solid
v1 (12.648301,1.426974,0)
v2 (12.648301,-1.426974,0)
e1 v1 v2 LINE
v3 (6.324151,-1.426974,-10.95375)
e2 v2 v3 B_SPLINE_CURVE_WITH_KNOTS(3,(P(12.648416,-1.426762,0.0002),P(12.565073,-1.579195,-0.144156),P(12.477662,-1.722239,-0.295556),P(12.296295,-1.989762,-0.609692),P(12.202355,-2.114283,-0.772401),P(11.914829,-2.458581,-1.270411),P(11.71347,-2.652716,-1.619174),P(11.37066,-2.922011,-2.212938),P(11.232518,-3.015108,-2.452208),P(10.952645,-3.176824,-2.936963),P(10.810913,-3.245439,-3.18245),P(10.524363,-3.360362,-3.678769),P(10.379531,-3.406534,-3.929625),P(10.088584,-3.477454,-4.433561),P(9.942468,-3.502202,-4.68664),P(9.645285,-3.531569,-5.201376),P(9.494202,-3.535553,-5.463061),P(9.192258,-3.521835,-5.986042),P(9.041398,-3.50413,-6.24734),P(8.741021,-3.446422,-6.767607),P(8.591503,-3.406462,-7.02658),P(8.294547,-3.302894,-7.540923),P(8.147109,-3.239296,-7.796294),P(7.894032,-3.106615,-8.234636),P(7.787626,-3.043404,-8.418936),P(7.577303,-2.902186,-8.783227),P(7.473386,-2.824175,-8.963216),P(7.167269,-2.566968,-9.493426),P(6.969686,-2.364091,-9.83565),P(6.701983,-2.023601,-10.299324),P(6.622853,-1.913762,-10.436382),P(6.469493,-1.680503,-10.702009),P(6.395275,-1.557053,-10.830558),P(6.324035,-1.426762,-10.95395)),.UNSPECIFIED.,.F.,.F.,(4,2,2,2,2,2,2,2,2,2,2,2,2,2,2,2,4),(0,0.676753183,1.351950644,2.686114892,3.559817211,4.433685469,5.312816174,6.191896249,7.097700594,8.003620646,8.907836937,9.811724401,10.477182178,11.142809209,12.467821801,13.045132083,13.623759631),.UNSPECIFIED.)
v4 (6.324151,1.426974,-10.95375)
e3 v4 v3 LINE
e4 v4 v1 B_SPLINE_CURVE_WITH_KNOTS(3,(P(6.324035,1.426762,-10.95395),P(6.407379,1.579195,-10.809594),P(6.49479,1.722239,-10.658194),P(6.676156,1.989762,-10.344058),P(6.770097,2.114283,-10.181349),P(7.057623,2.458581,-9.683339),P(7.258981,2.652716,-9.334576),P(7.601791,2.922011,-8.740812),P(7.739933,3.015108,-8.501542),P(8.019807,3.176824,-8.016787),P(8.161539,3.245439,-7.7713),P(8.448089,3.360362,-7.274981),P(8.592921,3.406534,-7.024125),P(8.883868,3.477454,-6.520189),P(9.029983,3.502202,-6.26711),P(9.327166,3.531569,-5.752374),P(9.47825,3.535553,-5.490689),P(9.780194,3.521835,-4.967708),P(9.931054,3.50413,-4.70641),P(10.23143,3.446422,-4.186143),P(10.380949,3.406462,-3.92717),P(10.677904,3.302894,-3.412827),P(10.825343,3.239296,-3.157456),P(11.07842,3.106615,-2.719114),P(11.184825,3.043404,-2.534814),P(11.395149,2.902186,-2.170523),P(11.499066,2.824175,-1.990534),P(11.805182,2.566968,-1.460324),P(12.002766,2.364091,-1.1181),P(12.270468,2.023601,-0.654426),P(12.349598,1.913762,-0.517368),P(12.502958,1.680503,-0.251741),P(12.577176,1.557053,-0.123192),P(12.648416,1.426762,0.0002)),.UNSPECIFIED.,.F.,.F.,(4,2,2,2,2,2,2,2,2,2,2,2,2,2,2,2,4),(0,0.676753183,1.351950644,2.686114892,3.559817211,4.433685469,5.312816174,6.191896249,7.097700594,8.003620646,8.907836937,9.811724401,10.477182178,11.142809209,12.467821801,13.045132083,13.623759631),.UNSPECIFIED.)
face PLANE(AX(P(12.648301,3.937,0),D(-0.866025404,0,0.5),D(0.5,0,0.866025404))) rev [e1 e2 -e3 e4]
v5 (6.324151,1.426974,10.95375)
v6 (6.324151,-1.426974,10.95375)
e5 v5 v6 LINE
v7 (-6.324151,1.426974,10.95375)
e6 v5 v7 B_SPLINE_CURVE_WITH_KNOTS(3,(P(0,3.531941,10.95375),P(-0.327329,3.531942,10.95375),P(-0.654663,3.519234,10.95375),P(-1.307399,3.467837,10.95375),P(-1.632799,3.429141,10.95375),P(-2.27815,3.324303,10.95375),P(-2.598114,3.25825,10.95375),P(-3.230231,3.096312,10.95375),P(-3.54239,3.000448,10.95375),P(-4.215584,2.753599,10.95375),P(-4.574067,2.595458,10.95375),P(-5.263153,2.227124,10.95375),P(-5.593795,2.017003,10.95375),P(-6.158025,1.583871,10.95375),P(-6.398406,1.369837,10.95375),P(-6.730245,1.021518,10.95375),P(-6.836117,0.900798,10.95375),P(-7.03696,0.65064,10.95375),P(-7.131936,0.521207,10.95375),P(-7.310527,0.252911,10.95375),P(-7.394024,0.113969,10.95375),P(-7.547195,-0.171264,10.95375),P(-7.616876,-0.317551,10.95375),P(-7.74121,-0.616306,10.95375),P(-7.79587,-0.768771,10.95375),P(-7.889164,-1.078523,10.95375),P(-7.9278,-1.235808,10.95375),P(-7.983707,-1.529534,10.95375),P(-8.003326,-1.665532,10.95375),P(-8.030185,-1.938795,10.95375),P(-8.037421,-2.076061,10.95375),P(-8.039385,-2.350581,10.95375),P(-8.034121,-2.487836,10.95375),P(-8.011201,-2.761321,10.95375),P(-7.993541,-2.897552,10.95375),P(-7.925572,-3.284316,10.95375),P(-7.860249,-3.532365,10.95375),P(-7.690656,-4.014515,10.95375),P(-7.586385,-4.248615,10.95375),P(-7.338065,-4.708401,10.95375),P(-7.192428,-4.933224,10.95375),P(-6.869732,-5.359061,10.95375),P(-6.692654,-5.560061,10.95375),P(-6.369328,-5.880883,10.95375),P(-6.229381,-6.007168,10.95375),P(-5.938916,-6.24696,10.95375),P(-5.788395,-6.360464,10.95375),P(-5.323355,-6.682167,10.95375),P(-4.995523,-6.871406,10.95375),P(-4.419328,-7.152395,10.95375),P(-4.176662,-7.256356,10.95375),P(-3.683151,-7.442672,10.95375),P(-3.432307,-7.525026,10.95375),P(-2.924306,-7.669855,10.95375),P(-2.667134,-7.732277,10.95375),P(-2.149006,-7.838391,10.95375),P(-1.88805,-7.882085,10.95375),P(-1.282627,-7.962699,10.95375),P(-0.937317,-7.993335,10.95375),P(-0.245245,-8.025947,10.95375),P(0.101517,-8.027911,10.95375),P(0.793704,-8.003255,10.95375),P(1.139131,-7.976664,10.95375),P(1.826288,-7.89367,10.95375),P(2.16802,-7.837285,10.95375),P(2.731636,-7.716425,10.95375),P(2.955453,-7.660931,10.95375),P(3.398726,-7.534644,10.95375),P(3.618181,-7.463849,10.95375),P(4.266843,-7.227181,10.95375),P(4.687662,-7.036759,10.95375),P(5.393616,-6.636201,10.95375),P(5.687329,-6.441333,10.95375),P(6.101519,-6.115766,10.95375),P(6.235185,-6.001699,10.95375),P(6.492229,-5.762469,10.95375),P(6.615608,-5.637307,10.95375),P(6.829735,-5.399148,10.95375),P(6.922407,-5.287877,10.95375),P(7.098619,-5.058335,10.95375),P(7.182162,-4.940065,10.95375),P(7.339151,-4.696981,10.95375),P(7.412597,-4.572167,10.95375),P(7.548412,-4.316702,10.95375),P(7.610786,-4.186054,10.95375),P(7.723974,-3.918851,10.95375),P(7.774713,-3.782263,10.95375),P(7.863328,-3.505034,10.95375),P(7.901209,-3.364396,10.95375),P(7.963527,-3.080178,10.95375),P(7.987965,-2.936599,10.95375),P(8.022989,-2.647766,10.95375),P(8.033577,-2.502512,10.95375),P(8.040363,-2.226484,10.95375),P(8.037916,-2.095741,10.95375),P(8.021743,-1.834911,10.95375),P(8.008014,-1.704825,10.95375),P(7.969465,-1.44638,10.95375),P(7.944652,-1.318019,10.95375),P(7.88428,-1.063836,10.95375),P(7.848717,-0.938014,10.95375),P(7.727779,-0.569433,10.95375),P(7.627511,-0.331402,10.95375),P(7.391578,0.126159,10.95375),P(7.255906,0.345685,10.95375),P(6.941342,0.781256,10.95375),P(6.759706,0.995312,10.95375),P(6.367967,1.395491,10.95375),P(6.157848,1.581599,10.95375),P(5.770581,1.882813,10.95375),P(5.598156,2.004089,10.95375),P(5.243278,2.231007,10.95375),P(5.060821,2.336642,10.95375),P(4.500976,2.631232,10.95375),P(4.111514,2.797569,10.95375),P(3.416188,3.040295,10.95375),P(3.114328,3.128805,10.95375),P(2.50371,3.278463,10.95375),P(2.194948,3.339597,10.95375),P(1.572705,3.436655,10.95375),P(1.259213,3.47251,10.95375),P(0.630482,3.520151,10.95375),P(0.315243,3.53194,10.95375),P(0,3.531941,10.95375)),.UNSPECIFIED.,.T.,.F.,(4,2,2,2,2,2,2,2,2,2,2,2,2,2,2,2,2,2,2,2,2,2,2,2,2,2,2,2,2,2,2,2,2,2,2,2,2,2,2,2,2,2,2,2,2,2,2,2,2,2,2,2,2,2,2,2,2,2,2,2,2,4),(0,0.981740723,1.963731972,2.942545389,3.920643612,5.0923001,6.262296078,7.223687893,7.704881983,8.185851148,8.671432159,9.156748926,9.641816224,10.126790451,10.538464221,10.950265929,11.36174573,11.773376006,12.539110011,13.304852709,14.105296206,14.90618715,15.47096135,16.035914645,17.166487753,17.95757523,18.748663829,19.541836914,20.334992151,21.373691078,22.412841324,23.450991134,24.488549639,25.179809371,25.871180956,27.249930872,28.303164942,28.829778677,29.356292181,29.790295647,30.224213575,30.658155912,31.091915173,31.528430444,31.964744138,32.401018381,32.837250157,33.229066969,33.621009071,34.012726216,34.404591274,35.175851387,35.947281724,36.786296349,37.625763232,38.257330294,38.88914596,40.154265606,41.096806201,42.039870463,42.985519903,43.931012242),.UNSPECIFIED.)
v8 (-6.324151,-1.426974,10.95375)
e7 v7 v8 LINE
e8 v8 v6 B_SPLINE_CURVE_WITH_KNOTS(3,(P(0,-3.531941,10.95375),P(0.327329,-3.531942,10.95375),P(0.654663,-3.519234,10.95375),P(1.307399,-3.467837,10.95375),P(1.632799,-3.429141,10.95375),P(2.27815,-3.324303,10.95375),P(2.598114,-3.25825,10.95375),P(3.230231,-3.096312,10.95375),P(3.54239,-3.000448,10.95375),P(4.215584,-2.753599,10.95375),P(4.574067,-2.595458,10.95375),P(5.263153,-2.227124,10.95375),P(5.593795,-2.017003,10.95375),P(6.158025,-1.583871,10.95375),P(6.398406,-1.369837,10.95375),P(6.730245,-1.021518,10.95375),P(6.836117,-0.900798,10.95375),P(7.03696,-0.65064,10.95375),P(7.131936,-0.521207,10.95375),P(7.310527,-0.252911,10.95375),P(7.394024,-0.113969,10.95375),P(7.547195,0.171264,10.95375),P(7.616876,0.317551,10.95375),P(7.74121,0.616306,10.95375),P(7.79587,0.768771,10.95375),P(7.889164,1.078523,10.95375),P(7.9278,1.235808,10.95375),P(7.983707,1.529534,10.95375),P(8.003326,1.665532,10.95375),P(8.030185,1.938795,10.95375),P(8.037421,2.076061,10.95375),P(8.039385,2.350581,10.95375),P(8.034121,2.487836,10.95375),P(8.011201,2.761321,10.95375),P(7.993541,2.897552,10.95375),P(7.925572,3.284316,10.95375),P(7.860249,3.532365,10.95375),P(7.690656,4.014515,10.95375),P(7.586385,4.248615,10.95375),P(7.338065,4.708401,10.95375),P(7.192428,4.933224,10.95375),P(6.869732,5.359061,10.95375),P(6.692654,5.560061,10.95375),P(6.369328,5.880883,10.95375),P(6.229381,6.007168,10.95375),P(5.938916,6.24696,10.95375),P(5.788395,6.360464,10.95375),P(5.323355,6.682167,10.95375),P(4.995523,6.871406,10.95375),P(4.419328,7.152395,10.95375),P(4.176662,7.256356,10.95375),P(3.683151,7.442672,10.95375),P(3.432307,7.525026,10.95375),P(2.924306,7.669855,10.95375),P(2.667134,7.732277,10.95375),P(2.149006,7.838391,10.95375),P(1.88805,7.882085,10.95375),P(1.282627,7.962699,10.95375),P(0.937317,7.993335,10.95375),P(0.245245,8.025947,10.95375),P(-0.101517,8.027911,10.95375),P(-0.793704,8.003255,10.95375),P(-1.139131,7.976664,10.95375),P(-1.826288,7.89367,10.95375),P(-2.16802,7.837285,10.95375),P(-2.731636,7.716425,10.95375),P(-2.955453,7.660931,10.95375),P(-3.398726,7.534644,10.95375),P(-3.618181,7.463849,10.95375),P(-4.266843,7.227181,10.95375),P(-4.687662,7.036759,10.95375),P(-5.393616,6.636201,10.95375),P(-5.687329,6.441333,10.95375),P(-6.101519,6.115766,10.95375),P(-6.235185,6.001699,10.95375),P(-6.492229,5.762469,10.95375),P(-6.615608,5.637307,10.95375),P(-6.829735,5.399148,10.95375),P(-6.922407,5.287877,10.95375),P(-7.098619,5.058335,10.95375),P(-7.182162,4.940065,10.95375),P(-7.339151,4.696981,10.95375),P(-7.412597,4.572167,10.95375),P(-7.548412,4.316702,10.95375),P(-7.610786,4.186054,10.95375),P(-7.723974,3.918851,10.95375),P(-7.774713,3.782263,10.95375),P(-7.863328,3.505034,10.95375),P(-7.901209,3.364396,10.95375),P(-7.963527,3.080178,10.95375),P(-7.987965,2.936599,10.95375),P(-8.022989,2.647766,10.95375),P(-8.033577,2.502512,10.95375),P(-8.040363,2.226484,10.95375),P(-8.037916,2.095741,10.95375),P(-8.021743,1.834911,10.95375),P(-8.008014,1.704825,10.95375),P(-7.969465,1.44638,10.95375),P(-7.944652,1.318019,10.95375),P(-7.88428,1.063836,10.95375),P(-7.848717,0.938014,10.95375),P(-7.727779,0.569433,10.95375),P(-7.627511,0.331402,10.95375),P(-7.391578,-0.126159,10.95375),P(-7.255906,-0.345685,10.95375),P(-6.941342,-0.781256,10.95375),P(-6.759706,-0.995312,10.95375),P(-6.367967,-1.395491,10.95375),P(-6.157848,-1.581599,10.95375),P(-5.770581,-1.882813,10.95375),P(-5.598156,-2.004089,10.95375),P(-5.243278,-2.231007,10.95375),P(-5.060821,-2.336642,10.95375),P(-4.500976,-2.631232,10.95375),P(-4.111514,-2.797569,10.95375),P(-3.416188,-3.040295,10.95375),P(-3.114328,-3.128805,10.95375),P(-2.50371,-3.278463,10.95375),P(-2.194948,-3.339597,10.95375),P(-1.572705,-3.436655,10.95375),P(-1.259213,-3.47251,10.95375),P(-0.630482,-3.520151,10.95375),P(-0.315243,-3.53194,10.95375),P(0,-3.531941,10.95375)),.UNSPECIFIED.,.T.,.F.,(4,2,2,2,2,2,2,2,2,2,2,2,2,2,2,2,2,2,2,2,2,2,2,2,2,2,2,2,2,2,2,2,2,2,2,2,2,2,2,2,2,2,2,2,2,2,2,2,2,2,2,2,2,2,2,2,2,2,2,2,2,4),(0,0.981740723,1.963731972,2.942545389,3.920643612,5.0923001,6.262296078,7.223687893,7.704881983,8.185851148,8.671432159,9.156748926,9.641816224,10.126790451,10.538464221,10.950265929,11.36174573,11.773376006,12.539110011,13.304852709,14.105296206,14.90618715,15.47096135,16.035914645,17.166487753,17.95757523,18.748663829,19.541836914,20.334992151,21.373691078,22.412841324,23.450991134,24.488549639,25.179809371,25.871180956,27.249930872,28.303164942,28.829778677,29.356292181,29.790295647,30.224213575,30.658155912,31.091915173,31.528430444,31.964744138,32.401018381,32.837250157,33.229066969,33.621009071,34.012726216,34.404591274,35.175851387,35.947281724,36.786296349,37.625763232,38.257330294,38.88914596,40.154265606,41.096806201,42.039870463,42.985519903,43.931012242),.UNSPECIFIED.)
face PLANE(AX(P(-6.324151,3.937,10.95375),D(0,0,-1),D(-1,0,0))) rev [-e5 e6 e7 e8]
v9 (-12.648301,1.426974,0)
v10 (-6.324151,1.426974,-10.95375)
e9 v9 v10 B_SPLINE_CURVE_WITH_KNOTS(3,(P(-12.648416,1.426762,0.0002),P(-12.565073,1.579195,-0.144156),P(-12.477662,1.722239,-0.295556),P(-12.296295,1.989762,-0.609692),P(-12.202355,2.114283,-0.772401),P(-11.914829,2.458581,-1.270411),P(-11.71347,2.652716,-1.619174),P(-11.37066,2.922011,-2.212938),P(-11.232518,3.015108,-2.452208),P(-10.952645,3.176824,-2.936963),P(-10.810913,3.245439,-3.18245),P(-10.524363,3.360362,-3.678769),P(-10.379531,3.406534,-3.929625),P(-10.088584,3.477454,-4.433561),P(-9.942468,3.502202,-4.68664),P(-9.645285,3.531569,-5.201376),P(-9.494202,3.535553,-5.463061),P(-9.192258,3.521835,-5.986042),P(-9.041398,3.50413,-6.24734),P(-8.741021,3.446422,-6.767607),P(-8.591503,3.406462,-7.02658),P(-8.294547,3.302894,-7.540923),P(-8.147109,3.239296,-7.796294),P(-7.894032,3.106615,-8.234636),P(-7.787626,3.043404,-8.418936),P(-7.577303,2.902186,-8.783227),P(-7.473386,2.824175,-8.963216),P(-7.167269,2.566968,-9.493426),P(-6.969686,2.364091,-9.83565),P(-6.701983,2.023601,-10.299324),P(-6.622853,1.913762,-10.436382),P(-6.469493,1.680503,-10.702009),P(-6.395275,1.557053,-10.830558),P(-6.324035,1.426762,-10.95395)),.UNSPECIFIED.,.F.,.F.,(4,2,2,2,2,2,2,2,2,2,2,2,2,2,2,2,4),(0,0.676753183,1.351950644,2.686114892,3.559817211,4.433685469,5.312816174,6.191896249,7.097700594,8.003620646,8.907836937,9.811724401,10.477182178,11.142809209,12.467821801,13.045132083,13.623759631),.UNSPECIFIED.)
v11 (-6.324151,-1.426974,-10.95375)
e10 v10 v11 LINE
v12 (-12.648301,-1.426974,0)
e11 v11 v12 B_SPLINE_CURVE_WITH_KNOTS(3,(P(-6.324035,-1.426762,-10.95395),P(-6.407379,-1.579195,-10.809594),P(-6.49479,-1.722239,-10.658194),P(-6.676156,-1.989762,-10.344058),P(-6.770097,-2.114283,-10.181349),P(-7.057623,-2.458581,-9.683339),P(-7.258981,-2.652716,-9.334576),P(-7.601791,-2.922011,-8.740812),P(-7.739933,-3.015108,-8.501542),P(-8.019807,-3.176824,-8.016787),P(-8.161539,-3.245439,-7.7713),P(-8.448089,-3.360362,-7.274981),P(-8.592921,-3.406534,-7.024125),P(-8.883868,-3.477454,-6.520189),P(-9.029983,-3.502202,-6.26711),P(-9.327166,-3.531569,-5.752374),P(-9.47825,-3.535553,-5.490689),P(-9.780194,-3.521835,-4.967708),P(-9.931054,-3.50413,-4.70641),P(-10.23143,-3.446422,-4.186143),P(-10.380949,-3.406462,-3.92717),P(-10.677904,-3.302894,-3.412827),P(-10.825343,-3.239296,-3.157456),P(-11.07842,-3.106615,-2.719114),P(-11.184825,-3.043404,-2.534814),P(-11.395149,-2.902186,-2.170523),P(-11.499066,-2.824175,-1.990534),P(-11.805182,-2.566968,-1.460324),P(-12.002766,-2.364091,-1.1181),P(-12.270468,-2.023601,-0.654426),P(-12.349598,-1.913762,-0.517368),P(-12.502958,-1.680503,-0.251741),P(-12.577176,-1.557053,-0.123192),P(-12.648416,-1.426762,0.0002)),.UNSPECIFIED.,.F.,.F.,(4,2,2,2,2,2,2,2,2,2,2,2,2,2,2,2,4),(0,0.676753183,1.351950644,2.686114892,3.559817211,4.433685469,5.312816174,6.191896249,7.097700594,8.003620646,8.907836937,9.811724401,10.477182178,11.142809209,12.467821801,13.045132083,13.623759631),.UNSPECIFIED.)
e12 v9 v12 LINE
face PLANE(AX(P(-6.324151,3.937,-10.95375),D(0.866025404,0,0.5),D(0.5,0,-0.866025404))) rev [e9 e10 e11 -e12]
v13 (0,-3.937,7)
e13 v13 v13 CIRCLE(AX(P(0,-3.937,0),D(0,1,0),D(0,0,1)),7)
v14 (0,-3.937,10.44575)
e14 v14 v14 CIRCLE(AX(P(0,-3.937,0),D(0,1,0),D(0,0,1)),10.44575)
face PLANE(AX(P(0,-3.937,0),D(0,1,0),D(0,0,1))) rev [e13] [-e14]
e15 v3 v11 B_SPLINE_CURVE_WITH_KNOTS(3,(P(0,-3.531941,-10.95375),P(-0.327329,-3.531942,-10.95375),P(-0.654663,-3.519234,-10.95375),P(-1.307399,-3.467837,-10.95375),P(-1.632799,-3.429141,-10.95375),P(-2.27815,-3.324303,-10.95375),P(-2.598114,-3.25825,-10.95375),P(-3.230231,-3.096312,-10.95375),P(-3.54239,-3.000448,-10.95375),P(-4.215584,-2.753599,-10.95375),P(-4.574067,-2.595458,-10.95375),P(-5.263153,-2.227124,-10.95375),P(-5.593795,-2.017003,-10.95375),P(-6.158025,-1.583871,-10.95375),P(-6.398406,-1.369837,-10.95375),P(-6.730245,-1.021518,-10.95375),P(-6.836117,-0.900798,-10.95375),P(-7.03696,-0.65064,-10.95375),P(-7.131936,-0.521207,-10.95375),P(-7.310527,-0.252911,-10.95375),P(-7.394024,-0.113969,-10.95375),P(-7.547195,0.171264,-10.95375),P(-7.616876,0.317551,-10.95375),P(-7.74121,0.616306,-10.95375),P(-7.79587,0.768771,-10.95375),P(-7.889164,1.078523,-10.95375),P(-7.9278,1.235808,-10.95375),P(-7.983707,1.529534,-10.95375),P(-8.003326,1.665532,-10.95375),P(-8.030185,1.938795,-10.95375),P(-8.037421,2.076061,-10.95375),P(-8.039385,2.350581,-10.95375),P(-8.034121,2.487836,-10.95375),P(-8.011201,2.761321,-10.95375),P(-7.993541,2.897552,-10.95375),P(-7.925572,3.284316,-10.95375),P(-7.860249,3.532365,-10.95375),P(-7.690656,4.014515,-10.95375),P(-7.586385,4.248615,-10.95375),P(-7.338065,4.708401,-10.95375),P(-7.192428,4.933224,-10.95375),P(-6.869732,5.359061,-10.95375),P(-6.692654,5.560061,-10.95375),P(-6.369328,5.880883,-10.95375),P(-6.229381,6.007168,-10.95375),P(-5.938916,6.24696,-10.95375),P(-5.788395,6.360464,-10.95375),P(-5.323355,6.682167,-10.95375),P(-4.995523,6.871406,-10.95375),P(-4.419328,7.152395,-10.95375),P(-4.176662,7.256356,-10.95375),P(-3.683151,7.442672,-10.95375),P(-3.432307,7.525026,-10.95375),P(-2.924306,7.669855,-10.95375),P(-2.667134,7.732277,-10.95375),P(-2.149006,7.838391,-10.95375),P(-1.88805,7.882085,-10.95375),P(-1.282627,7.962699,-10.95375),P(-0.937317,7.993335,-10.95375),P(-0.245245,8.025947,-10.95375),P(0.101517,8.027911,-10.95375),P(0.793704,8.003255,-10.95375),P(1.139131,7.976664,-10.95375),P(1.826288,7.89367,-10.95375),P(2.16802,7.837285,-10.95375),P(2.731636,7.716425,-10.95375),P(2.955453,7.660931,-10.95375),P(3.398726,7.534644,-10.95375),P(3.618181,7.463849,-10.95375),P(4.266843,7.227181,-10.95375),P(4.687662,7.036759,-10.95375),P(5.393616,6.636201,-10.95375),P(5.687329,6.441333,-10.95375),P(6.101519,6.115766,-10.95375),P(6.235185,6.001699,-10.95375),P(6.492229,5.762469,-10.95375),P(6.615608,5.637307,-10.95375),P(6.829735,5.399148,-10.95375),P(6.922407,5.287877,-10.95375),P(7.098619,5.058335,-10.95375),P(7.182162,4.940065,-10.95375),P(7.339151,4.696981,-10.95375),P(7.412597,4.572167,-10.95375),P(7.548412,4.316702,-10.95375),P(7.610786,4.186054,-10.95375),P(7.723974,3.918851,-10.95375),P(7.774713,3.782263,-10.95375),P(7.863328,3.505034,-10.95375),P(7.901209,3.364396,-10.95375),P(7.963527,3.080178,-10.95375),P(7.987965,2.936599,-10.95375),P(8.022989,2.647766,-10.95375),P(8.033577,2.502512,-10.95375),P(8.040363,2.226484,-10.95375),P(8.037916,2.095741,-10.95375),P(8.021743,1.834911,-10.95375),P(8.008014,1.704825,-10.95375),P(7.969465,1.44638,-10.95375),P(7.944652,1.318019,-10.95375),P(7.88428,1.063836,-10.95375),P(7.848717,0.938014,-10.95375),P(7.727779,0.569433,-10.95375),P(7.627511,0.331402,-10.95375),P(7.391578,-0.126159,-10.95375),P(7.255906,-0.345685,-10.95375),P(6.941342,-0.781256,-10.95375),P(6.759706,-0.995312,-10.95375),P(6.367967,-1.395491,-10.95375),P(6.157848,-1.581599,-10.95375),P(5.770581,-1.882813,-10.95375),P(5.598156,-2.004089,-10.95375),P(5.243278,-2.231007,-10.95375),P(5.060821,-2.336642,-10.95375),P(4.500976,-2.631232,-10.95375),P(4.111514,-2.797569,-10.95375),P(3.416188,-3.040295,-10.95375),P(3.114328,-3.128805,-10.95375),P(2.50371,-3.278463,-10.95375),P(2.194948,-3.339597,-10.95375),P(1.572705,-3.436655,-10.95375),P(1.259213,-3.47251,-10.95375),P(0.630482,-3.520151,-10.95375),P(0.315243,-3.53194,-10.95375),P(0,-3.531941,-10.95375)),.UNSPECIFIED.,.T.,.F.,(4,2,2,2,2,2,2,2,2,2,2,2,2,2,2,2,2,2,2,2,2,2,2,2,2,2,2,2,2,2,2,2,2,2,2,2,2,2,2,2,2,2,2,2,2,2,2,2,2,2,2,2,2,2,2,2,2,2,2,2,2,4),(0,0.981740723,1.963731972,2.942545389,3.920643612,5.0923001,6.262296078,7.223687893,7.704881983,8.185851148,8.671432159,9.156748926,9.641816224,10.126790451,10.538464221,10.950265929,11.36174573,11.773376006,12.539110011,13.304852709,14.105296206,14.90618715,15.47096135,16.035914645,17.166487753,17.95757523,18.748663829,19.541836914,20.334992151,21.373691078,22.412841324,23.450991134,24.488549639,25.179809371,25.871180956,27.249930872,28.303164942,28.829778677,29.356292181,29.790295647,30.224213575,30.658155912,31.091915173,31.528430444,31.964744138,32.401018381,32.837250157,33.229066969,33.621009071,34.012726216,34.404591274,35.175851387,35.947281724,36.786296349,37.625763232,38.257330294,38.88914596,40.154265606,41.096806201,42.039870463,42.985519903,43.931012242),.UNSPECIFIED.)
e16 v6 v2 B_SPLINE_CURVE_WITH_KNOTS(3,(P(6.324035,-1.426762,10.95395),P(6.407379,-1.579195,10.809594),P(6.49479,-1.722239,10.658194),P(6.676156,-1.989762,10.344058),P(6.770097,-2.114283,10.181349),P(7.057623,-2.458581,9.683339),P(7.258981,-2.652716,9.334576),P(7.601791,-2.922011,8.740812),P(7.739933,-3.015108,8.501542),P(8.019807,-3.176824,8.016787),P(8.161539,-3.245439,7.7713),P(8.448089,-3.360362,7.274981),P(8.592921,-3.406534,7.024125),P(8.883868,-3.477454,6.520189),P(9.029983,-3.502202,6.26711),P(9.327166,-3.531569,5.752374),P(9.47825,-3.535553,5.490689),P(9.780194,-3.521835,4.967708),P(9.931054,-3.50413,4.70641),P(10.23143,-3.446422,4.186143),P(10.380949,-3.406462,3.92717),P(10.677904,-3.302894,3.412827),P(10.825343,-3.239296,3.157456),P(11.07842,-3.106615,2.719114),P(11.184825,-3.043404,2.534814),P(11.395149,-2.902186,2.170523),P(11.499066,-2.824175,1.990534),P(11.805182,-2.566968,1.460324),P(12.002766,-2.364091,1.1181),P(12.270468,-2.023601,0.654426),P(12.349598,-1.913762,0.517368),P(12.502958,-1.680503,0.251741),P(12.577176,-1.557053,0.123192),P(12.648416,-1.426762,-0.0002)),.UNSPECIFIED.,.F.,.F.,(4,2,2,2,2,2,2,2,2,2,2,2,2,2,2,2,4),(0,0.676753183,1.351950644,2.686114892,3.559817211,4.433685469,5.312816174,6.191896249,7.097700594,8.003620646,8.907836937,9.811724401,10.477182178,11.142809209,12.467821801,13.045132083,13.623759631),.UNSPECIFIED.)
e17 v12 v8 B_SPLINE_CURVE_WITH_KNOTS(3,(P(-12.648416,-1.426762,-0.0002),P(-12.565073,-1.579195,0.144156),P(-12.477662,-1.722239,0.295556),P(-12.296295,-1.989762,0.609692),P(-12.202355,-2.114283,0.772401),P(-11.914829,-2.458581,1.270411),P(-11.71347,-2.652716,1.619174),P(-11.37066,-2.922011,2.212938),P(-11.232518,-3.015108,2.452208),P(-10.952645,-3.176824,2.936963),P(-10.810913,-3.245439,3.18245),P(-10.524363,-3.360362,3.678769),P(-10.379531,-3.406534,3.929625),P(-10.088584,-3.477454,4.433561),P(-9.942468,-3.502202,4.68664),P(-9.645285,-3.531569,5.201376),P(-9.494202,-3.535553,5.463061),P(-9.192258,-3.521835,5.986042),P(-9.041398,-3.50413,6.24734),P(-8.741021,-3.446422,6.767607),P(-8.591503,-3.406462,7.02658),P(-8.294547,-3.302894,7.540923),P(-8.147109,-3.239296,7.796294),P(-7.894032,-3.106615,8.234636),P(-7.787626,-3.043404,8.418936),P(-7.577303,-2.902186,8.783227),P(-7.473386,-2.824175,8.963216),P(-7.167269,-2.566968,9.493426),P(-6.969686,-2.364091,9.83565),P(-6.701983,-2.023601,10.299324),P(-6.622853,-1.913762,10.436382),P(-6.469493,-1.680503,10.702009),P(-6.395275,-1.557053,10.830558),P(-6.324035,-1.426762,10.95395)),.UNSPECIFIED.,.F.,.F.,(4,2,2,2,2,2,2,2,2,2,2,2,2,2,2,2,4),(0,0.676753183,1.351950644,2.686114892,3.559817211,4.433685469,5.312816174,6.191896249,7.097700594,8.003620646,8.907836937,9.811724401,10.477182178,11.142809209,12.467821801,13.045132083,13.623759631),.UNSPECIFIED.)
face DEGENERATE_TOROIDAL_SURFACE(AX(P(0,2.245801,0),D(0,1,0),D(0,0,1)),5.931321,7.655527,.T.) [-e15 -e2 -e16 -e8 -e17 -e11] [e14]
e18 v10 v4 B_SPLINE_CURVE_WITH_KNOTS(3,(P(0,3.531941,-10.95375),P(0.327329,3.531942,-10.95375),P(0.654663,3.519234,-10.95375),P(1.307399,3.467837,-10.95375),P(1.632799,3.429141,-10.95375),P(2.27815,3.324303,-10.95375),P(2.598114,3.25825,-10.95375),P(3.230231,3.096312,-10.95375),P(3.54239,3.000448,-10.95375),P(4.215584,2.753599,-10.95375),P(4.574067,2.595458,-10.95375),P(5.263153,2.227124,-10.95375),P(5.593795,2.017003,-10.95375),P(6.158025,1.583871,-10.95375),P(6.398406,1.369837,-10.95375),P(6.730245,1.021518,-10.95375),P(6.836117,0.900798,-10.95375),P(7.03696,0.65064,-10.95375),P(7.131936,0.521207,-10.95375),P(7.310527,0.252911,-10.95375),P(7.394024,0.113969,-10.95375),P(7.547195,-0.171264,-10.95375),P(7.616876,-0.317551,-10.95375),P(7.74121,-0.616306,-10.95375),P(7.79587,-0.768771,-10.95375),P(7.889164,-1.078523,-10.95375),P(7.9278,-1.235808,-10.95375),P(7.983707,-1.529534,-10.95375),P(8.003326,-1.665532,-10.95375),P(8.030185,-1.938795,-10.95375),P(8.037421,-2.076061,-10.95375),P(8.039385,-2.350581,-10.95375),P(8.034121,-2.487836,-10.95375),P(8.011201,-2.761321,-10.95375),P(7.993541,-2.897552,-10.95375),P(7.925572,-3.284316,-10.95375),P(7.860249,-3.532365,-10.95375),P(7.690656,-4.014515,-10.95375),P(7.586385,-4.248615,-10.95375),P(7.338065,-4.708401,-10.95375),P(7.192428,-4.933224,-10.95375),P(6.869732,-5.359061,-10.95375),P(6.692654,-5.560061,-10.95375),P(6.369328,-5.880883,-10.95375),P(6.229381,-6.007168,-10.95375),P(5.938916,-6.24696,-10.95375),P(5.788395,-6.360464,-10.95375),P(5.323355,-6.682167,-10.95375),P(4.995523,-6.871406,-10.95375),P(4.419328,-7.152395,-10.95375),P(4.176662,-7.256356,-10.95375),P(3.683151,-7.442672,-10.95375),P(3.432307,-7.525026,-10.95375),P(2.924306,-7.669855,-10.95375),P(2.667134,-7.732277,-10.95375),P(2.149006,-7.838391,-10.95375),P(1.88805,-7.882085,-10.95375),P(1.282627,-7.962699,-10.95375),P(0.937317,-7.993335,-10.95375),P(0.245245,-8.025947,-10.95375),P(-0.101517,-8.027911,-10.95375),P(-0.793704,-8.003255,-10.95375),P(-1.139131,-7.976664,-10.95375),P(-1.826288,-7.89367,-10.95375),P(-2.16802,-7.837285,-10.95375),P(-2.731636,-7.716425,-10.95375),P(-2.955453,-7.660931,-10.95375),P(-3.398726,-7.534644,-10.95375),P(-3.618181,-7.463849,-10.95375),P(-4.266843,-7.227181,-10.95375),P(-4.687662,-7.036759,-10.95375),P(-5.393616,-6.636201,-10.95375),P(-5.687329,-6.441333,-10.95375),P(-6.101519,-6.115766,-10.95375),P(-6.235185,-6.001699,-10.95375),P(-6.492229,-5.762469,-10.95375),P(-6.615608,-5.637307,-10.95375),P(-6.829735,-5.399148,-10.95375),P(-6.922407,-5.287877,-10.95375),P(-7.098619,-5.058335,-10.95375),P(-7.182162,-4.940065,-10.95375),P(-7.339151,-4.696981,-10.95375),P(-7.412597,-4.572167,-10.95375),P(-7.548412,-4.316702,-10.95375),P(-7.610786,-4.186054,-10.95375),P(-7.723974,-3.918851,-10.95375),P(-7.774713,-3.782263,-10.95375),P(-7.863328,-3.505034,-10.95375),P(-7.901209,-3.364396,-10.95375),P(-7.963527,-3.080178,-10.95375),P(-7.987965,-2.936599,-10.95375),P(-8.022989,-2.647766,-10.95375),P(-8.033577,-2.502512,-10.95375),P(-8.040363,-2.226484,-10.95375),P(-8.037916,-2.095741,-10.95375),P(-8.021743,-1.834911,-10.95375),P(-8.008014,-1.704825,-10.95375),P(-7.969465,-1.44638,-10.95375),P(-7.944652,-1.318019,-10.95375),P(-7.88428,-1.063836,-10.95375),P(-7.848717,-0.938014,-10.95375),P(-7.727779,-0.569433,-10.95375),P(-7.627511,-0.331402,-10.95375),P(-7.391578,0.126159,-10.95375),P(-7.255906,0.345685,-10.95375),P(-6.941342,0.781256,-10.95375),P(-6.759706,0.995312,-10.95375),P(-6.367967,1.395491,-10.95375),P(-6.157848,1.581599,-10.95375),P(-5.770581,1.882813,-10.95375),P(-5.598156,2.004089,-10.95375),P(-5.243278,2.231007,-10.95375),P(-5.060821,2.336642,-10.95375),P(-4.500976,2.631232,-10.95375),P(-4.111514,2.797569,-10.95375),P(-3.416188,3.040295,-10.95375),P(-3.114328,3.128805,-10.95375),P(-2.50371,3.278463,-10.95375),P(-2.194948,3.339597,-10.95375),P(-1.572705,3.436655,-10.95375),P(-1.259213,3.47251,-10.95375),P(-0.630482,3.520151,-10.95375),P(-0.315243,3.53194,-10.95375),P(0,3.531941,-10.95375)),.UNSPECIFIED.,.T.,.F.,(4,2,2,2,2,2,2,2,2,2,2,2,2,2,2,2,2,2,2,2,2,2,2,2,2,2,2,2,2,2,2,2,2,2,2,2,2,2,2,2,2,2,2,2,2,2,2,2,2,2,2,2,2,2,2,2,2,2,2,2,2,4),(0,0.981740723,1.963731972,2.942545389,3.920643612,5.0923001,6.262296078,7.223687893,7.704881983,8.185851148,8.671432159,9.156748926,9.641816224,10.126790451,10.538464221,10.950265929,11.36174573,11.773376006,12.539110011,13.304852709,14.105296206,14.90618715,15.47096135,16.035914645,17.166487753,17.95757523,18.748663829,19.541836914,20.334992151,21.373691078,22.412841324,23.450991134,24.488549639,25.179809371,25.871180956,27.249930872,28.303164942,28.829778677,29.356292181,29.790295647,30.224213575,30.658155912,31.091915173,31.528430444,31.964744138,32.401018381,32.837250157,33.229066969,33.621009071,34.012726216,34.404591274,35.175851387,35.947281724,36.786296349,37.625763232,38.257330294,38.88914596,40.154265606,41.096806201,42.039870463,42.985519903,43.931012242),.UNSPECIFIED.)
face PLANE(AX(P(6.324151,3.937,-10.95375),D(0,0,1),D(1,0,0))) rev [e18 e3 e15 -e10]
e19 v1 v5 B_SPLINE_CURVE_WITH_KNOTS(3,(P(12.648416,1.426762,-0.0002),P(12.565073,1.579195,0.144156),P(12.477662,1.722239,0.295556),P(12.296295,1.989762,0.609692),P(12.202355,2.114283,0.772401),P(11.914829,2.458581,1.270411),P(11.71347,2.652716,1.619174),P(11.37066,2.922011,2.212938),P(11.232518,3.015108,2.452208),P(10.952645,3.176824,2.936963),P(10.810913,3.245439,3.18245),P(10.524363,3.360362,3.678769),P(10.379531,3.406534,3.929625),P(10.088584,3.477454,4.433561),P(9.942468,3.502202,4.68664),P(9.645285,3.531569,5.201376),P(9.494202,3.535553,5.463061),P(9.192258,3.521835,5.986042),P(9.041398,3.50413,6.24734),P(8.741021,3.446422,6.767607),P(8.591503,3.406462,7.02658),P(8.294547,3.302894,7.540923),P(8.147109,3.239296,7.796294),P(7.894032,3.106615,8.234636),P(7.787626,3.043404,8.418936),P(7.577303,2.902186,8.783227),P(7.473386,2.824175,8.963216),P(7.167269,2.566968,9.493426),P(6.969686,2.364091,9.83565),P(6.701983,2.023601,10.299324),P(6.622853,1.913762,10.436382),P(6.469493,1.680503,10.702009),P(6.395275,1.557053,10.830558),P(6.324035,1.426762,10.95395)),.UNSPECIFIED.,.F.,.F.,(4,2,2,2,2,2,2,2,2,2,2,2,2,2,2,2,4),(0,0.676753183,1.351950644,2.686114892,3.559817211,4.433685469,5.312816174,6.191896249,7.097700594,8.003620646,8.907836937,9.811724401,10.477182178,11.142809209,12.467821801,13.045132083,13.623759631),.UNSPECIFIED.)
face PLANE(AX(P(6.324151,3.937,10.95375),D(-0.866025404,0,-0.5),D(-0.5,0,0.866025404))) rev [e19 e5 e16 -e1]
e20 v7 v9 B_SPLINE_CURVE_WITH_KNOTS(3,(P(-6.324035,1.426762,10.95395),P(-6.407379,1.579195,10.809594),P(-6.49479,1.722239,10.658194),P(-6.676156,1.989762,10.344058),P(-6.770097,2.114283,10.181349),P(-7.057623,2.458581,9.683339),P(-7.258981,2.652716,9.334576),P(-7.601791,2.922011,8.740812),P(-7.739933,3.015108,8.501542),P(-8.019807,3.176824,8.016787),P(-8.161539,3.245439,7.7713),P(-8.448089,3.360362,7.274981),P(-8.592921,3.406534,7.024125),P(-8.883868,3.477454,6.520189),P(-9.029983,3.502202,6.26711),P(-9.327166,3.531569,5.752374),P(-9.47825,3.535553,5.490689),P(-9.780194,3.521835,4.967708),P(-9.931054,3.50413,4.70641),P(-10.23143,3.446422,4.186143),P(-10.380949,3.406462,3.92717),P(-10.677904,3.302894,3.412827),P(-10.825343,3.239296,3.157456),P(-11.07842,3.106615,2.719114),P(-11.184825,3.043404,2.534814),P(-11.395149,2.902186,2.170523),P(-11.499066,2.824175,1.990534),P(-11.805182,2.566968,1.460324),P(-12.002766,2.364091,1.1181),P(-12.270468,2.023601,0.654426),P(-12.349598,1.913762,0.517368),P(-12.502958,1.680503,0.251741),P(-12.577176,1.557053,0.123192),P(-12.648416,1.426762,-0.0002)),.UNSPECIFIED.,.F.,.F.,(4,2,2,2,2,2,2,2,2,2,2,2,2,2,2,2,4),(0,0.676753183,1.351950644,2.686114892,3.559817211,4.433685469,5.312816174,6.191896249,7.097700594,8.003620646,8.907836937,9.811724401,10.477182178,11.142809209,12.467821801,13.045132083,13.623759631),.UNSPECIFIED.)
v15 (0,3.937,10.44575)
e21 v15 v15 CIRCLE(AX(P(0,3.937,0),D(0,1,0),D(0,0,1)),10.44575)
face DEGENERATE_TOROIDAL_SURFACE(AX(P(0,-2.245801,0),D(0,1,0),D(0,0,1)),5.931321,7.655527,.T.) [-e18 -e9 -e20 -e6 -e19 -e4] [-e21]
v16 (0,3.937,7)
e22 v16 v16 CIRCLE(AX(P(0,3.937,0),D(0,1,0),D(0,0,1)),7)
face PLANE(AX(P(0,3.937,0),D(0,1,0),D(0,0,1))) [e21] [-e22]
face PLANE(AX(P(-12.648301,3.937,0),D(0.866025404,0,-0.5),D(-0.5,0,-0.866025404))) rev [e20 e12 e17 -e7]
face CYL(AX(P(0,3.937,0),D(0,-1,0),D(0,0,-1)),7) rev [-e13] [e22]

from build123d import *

# Parameters (mm, degrees)
SKETCH1_R           = 7
BOSS_EXTRUDE1_DEPTH = 3.937


# Read off the part's stored shape, not the designer's step: Cut-Revolve-Thin1
with BuildPart() as part:
    # Sketch1 → Boss-Extrude1 (new, symmetric)
    with BuildSketch(Plane(origin=(0, 0, 0), x_dir=(1, 0, 0), z_dir=(0, 1, 0))):
        Polygon((6.324150511, 10.95375), (-6.324150511, 10.95375), (-12.648301022, 0), (-6.324150511, -10.95375), (6.324150511, -10.95375), (12.648301022, 0), align=None)
        with Locations(Location((0, 0, 0), (0, 0, 270))):
            Circle(SKETCH1_R, mode=Mode.SUBTRACT)
    extrude(amount=BOSS_EXTRUDE1_DEPTH, both=True)

    # Cut-Revolve-Thin1 outline → Cut-Revolve-Thin1 (revolve, cut)
    with BuildSketch(Plane.XY):
        with BuildLine():
            ThreePointArc((12.648306093, -1.426964265), (11.685557296, -2.803541534), (10.44575, -3.937))
            Line((10.44575, -3.937), (12.648306093, -3.937))
            Line((12.648306093, -3.937), (12.648306093, -1.426964265))
        make_face()
        with BuildLine():
            ThreePointArc((10.44575, 3.937), (11.685557296, 2.803541534), (12.648306093, 1.426964265))
            Line((12.648306093, 1.426964265), (12.648306093, 3.937))
            Line((12.648306093, 3.937), (10.44575, 3.937))
        make_face()
    revolve(axis=Axis((0, 0, 0), (0, 1, 0)), mode=Mode.SUBTRACT)


solid = part.part
